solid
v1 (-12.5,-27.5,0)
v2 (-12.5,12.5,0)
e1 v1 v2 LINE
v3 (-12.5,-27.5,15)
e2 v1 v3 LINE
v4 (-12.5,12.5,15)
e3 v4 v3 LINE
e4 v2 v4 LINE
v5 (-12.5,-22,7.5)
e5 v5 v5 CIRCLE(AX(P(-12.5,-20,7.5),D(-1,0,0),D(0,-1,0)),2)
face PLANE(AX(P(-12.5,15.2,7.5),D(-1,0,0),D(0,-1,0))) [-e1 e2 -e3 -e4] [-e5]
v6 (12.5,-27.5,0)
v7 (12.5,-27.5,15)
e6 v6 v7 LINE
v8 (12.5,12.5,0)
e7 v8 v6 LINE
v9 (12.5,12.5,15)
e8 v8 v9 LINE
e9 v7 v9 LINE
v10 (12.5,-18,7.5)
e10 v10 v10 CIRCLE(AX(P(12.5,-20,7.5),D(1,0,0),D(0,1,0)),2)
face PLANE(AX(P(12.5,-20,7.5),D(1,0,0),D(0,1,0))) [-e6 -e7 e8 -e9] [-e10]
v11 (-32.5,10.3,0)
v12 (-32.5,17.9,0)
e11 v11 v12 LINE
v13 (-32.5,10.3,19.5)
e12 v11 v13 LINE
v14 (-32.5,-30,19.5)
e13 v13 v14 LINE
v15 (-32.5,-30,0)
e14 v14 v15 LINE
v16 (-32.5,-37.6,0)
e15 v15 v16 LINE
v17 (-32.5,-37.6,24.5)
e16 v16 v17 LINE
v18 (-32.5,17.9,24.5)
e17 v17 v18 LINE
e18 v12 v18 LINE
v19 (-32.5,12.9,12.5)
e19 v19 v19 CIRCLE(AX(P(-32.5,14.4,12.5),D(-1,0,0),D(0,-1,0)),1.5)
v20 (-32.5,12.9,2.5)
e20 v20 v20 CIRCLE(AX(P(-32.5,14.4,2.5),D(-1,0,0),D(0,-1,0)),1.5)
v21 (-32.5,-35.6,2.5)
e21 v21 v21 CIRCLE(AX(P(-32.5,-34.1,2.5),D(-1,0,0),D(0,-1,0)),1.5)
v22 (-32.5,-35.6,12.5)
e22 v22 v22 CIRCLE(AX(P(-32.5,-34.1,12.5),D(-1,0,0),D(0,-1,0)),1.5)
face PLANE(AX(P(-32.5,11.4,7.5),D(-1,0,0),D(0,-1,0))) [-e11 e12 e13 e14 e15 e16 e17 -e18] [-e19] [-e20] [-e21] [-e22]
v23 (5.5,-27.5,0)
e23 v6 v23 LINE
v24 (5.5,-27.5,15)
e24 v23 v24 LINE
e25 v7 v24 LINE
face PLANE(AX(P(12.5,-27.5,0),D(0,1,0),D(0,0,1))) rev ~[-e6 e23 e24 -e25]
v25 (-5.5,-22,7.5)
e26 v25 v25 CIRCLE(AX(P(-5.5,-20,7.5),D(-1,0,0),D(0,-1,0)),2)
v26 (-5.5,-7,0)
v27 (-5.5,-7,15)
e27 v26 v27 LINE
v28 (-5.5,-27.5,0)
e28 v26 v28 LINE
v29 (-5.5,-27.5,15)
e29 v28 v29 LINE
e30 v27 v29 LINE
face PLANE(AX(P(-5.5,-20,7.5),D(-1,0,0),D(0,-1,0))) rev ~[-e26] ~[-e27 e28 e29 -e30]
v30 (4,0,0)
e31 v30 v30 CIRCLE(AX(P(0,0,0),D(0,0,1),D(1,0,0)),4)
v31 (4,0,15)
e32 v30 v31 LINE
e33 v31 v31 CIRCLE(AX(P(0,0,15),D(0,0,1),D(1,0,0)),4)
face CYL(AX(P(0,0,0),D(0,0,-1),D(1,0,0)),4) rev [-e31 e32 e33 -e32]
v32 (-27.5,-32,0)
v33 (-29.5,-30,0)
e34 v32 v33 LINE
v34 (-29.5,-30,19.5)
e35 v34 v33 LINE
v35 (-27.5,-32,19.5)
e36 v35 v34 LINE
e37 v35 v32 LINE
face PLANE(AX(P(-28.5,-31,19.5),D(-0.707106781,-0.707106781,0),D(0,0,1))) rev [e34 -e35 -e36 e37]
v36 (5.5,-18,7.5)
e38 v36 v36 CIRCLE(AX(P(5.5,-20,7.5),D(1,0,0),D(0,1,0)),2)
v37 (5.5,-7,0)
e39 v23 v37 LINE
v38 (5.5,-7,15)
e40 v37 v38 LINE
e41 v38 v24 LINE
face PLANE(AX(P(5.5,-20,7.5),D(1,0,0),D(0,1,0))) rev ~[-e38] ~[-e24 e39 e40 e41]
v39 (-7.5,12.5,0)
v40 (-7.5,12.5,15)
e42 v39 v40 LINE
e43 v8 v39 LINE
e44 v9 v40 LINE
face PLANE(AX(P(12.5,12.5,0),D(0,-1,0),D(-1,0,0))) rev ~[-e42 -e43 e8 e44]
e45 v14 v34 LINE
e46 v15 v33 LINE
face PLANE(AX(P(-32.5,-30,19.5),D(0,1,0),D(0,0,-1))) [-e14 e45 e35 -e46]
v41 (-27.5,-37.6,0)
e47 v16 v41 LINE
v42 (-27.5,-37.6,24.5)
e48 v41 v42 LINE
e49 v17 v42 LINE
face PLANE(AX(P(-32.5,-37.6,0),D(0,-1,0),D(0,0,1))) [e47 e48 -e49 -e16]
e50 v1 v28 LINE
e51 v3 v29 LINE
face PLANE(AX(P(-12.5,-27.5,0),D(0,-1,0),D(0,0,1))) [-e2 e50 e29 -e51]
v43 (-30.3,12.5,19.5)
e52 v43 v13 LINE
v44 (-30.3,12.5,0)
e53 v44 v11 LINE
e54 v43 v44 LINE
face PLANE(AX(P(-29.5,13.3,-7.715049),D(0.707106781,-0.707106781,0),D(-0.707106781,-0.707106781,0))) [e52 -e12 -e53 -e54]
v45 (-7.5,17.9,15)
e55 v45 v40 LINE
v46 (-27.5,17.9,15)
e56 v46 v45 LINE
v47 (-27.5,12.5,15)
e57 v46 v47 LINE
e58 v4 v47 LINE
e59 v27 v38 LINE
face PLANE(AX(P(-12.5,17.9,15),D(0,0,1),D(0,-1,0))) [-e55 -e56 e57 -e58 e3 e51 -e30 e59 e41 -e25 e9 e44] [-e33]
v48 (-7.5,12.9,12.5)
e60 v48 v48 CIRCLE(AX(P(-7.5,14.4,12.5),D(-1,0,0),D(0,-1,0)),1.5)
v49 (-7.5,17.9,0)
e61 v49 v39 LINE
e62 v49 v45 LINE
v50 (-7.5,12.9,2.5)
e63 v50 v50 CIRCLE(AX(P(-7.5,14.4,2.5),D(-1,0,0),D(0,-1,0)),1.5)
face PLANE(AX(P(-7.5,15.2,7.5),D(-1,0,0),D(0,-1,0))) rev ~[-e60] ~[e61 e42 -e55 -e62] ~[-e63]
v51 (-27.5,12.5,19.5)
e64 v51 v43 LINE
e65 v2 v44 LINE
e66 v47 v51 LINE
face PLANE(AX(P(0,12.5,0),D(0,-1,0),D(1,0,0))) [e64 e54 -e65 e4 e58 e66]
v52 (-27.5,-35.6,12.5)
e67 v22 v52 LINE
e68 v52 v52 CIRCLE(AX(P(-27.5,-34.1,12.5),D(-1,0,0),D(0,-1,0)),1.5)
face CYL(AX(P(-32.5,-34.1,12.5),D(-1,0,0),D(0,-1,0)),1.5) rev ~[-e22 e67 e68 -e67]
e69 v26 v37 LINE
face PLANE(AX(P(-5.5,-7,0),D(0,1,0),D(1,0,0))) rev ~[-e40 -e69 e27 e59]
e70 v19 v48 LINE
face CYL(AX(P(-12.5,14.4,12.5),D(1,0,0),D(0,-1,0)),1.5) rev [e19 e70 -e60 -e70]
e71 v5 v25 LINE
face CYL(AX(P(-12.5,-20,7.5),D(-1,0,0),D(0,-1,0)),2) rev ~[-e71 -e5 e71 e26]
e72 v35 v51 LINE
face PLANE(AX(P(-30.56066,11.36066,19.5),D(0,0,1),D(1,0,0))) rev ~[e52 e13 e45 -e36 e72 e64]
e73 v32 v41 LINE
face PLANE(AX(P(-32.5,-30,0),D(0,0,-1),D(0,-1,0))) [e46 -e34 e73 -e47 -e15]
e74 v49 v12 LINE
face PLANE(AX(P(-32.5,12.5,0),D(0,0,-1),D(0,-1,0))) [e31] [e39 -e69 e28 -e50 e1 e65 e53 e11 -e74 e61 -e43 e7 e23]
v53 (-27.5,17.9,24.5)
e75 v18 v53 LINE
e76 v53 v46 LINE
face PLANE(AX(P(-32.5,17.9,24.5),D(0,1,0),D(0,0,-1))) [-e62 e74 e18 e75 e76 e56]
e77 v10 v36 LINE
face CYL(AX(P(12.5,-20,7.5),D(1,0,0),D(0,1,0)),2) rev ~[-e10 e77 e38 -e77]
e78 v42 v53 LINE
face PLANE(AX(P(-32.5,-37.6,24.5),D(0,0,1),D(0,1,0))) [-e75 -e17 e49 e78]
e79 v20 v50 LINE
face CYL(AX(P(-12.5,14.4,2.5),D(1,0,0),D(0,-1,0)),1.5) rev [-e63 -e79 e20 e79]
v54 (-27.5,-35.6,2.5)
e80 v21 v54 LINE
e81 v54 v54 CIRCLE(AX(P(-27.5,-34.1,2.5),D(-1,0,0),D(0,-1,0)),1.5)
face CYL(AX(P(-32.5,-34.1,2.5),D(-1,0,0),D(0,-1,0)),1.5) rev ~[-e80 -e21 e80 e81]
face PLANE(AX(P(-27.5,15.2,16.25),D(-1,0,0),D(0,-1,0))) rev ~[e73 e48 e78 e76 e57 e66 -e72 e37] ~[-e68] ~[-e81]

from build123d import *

# Parameters (mm, degrees)
F0_R         = 4
F1_DEPTH     = 15
F3_W         = 15
F3_H         = 15
F3_R         = 2
F4_DEPTH     = 7
F6_W         = 15
F6_H         = 15
F6_R         = 2
F7_DEPTH     = 7
F8_W         = 5.4
F8_H         = 15
F8_R         = 1.5
F9_DEPTH     = 5
F10_DEPTH    = 20
F12_W        = 5.4
F12_H        = 2.5
F12_W_2      = 7.6
F12_H_2      = 15
F12_R        = 1.5
F13_DEPTH    = 5
F12_W_3      = 2.2
F12_H_3      = 2
F14_DEPTH    = 3
F15_T4_DEPTH = 27.2150489639
F16_SIZE     = 2


# Not quite as in the source:
# - a fillet or chamfer that OpenCascade refuses, or shapes differently, is made with other operations: its cross-section is extruded or revolved along the edge and cut away or added


with BuildPart() as f1:
    # F0 (on Top) → F1 (new body)
    with BuildSketch(Plane.XY):
        Polygon((12.5, -12.5), (12.5, 12.5), (-12.5, 12.5), (-12.5, -12.5), (-5.5, -12.5), (-5.5, -7), (5.5, -7), (5.5, -12.5), align=None)
        Circle(F0_R, mode=Mode.SUBTRACT)
    extrude(amount=F1_DEPTH)

    # F3 (on offset) → F4 (join)
    with BuildSketch(Plane(origin=(-12.5, 0, 0), x_dir=(0, -1, 0), z_dir=(-1, 0, 0))):
        with Locations((20, 7.5)):
            Rectangle(F3_W, F3_H)
        with Locations((20, 7.5)):
            Circle(F3_R, mode=Mode.SUBTRACT)
    extrude(amount=-F4_DEPTH)

    # F6 (on offset) → F7 (join)
    with BuildSketch(Plane.YZ.offset(12.5)):
        with Locations((-20, 7.5)):
            Rectangle(F6_W, F6_H)
        with Locations((-20, 7.5)):
            Circle(F6_R, mode=Mode.SUBTRACT)
    extrude(amount=-F7_DEPTH)

    # F8 (on offset) → F9 (join)
    with BuildSketch(Plane(origin=(-12.5, 0, 0), x_dir=(0, -1, 0), z_dir=(-1, 0, 0))):
        with Locations((-15.2, 7.5)):
            Rectangle(F8_W, F8_H)
        with Locations((-14.4, 2.5)):
            Circle(F8_R, mode=Mode.SUBTRACT)
        with Locations((-14.4, 12.5)):
            Circle(F8_R, mode=Mode.SUBTRACT)
    extrude(amount=-F9_DEPTH)

    # F8 (on offset) → F10 (join)
    with BuildSketch(Plane(origin=(-12.5, 0, 0), x_dir=(0, -1, 0), z_dir=(-1, 0, 0))):
        with Locations((-15.2, 7.5)):
            Rectangle(F8_W, F8_H)
        with Locations((-14.4, 2.5)):
            Circle(F8_R, mode=Mode.SUBTRACT)
        with Locations((-14.4, 12.5)):
            Circle(F8_R, mode=Mode.SUBTRACT)
    extrude(amount=F10_DEPTH)

    # F12 (on offset) → F13 (join)
    with BuildSketch(Plane(origin=(-32.5, 0, 0), x_dir=(0, -1, 0), z_dir=(-1, 0, 0))):
        with Locations((-15.2, 16.25)):
            Rectangle(F12_W, F12_H)
        Polygon((30, 19.5), (30, 17.5), (37.6, 17.5), (37.6, 24.5), (-17.9, 24.5), (-17.9, 17.5), (-12.5, 17.5), (-12.5, 19.5), (-10.3, 19.5), align=None)
        with Locations((33.8, 16.25)):
            Rectangle(F12_W_2, F12_H)
        with Locations((33.8, 7.5)):
            Rectangle(F12_W_2, F12_H_2)
        with Locations((34.1, 2.5)):
            Circle(F12_R, mode=Mode.SUBTRACT)
        with Locations((34.1, 12.5)):
            Circle(F12_R, mode=Mode.SUBTRACT)
    extrude(amount=-F13_DEPTH)

    # F12 (on offset) → F14 (join)
    with BuildSketch(Plane(origin=(-32.5, 0, 0), x_dir=(0, -1, 0), z_dir=(-1, 0, 0))):
        with Locations((-11.4, 7.5)):
            Rectangle(F12_W_3, F12_H_2)
        with Locations((-11.4, 16.25)):
            Rectangle(F12_W_3, F12_H)
        with Locations((-11.4, 18.5)):
            Rectangle(F12_W_3, F12_H_3)
    extrude(amount=-F14_DEPTH)

    # F15: chamfer of 3 on 1 edges, made by hand


with BuildPart() as f15_tool2:
    # F15_s3 → F15_t4 (new body)
    with BuildSketch(Plane.XY.offset(-7.7150489639)):
        Polygon((-29.5, 13.3), (-32.5, 10.3), (-29.5, 10.3), align=None)
    extrude(amount=F15_T4_DEPTH)

    split(bisect_by=Plane.XZ.offset(-12.5), keep=Keep.TOP)


with BuildPart() as f1_1:
    add(f1.part)

    # F15_t1: cut F15_tool2
    add(f15_tool2.part, mode=Mode.SUBTRACT)

    # F16
    f16_edges = [f1_1.edges().sort_by_distance(p)[0] for p in [
        (-27.5, -30, 9.75),
    ]]
    chamfer(f16_edges, length=F16_SIZE)


solid = f1_1.part
